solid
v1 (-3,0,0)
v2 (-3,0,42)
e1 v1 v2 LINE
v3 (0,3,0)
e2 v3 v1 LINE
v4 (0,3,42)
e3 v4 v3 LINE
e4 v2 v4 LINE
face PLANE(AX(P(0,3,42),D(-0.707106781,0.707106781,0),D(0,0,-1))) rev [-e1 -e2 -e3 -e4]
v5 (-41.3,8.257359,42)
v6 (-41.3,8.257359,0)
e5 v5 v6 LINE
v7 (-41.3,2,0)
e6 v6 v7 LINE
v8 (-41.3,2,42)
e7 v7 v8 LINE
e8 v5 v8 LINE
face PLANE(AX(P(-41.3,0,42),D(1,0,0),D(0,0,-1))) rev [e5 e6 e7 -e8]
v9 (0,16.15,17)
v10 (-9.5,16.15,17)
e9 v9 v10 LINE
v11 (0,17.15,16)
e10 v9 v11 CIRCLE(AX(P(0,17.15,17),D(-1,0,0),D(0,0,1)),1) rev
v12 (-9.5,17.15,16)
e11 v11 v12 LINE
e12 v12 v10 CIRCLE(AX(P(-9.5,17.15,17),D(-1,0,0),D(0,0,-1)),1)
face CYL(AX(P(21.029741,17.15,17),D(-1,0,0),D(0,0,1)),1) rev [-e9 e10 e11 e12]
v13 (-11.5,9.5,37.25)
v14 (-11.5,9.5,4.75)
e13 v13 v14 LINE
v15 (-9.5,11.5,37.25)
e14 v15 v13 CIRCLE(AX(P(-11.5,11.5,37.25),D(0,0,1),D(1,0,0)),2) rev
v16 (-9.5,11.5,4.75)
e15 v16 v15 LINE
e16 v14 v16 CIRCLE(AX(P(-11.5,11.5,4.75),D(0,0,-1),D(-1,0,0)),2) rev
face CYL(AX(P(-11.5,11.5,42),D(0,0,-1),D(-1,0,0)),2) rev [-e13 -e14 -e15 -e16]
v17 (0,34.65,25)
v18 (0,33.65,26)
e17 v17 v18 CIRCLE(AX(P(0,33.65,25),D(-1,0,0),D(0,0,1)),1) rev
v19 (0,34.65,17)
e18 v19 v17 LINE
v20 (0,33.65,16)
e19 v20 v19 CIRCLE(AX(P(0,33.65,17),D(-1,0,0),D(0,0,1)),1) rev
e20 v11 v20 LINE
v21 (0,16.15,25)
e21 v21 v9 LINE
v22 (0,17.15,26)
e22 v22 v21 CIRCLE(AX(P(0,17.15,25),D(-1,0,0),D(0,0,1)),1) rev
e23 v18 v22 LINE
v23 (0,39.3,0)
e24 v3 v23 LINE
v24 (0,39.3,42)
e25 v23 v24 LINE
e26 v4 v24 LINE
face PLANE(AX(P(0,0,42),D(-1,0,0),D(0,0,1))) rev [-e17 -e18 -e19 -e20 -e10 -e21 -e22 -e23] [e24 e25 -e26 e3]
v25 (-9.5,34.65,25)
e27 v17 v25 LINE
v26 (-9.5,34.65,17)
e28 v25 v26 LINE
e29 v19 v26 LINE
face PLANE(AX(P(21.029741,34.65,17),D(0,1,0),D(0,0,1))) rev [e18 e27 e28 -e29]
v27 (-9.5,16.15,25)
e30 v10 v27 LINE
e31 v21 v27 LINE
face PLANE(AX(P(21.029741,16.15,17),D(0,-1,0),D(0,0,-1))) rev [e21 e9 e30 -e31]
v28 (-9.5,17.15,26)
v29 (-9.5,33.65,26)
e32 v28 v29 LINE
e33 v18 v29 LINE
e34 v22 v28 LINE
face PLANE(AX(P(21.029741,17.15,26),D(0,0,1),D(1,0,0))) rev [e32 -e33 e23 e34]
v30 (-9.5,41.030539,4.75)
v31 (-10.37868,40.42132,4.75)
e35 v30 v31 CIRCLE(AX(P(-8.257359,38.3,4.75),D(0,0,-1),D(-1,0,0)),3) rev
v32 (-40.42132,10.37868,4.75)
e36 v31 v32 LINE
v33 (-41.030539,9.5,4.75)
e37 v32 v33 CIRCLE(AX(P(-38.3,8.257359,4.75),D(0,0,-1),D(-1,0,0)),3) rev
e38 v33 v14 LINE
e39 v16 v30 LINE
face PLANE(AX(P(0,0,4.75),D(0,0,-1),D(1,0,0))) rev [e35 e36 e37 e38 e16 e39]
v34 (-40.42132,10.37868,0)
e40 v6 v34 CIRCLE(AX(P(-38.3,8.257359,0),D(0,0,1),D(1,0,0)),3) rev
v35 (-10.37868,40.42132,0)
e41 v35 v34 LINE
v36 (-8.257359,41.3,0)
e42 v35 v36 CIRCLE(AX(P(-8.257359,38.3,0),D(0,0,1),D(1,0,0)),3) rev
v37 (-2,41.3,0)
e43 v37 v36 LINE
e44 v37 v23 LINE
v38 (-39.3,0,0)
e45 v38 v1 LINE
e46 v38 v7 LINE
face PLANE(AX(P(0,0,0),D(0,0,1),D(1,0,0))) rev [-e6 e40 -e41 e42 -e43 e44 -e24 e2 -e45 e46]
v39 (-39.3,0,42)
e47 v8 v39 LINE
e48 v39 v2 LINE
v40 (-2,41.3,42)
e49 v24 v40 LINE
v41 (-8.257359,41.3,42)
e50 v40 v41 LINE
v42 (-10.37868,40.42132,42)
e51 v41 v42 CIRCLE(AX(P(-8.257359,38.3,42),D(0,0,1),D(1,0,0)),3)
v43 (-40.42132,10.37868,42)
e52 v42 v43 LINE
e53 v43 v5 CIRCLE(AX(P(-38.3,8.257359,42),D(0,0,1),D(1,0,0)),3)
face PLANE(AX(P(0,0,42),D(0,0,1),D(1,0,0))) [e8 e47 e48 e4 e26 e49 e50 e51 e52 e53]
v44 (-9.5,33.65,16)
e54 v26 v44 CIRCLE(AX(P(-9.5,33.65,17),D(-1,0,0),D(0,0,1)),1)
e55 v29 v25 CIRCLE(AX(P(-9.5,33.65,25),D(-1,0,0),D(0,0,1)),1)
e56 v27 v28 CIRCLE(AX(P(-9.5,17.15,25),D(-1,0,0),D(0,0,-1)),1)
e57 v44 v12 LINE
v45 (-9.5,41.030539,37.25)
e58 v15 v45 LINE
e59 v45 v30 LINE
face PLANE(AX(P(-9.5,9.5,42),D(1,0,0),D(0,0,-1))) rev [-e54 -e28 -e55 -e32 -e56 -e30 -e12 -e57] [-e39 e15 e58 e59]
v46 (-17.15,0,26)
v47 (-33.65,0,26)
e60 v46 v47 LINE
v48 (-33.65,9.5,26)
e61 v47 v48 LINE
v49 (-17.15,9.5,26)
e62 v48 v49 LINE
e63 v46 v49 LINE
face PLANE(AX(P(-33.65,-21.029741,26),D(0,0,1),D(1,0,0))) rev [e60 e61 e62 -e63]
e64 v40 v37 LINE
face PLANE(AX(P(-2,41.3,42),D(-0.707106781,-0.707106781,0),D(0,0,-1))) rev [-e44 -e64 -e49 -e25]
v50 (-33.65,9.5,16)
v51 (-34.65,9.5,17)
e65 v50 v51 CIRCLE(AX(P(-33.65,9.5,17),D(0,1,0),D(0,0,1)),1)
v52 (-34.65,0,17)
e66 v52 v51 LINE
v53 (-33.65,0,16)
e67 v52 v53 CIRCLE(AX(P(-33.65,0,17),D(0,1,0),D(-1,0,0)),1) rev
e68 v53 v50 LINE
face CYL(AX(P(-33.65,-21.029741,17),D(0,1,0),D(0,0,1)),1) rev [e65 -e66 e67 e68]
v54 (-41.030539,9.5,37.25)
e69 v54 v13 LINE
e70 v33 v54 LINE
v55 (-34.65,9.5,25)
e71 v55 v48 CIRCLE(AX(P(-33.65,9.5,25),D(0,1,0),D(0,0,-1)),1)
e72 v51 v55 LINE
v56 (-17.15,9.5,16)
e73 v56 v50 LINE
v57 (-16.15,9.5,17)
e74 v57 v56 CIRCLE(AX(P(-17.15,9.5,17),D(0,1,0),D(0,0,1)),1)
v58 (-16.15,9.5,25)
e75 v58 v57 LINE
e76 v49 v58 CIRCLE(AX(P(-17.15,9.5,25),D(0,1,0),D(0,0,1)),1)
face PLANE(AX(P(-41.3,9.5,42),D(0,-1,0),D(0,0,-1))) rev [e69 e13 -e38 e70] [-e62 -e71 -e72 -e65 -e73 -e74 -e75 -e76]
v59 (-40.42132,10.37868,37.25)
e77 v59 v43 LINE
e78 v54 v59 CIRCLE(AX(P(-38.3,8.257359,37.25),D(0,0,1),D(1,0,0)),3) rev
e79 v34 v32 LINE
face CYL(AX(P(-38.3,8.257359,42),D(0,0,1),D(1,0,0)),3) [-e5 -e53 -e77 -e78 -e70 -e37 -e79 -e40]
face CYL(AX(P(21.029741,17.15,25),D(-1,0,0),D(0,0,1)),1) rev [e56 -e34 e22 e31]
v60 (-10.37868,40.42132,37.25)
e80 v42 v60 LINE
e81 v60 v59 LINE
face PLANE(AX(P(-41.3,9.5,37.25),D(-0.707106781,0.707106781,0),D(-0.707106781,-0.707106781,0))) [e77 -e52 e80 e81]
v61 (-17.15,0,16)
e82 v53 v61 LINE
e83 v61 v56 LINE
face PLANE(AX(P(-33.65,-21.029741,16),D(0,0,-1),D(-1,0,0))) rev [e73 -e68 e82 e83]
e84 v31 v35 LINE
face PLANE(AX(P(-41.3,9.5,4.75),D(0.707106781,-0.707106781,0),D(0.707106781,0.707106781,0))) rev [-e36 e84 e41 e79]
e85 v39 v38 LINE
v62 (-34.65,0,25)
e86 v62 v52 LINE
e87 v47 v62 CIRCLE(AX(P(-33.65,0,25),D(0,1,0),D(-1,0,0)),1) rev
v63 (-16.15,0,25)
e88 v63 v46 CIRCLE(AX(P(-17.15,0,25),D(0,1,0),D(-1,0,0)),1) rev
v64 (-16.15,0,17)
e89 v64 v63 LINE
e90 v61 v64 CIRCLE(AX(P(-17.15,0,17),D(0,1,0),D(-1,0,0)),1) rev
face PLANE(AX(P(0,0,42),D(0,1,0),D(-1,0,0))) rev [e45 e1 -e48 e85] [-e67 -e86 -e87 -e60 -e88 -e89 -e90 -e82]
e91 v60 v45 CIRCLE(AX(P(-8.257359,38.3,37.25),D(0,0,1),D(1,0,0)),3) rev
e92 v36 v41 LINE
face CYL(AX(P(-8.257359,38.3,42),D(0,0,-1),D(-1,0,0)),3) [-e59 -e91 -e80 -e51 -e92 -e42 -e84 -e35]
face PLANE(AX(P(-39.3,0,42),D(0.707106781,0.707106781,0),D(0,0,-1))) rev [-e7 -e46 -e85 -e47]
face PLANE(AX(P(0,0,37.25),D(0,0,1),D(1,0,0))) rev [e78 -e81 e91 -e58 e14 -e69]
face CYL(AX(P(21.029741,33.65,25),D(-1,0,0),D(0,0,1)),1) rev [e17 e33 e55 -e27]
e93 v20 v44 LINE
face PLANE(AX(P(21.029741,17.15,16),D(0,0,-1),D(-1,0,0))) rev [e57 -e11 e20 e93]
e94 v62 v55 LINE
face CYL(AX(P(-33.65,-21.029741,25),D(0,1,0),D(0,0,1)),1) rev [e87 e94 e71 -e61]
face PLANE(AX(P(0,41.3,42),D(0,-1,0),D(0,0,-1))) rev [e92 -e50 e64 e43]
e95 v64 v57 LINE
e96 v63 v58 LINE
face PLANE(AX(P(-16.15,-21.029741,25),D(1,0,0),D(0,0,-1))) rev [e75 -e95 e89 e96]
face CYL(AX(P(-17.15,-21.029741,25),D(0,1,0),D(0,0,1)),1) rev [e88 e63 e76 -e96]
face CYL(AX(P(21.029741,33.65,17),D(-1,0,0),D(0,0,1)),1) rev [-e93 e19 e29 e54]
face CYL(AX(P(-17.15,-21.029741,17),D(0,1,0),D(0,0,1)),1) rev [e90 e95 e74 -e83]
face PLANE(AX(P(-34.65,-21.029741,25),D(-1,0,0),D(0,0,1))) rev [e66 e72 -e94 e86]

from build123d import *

# Parameters (mm, degrees)
BOSS_EXTRUDE1_DEPTH = 42
BOSS_EXTRUDE2_DEPTH = 4.75
CUT_EXTRUDE1_DEPTH  = 9.5
CUT_EXTRUDE2_DEPTH  = 9.5
FILLET6_R           = 2
FILLET7_START       = -1
FILLET7_DEPTH       = 44
FILLET8_START       = -1
FILLET8_DEPTH       = 44
CHAMFER1_SIZE       = 2
CHAMFER2_SIZE       = 3
CHAMFER3_SIZE       = 2


with BuildPart() as part:
    # Sketch1 → Boss-Extrude1 (new body)
    with BuildSketch(Plane.XY):
        Polygon((0, 0), (-41.3, 0), (-41.3, 9.5), (-9.5, 9.5), (-9.5, 41.3), (0, 41.3), align=None)
    extrude(amount=BOSS_EXTRUDE1_DEPTH)

    # Sketch2 → Boss-Extrude2 (add)
    with BuildSketch(Plane.XY.offset(42)):
        Polygon((-41.3, 9.5), (-9.5, 41.3), (-9.5, 9.5), align=None)
    boss_extrude2 = extrude(amount=-BOSS_EXTRUDE2_DEPTH)

    # Mirror1: Boss-Extrude2 across plane
    add(boss_extrude2.mirror(Plane.XY.offset(21)))

    # Sketch3 → Cut-Extrude1 (cut)
    with BuildSketch(Plane.ZY.offset(9.5)):
        with BuildLine():
            Line((17, 16.15), (25, 16.15))
            ThreePointArc((25, 16.15), (25.707106781, 16.442893219), (26, 17.15))
            Line((26, 17.15), (26, 33.65))
            ThreePointArc((26, 33.65), (25.707106781, 34.357106781), (25, 34.65))
            Line((25, 34.65), (17, 34.65))
            ThreePointArc((17, 34.65), (16.292893219, 34.357106781), (16, 33.65))
            Line((16, 33.65), (16, 17.15))
            ThreePointArc((16, 17.15), (16.292893219, 16.442893219), (17, 16.15))
        make_face()
    extrude(amount=-CUT_EXTRUDE1_DEPTH, mode=Mode.SUBTRACT)

    # Sketch4 → Cut-Extrude2 (cut)
    with BuildSketch(Plane(origin=(0, 9.5, 0), x_dir=(1, 0, 0), z_dir=(0, 1, 0))):
        with BuildLine():
            Line((-33.65, -26), (-17.15, -26))
            ThreePointArc((-17.15, -26), (-16.442893219, -25.707106781), (-16.15, -25))
            Line((-16.15, -25), (-16.15, -17))
            ThreePointArc((-16.15, -17), (-16.442893219, -16.292893219), (-17.15, -16))
            Line((-17.15, -16), (-33.65, -16))
            ThreePointArc((-33.65, -16), (-34.357106781, -16.292893219), (-34.65, -17))
            Line((-34.65, -17), (-34.65, -25))
            ThreePointArc((-34.65, -25), (-34.357106781, -25.707106781), (-33.65, -26))
        make_face()
    extrude(amount=-CUT_EXTRUDE2_DEPTH, mode=Mode.SUBTRACT)

    # Fillet6
    fillet6_edges = [part.edges().sort_by_distance(p)[0] for p in [
        (-9.5, 9.5, 21),
    ]]
    fillet(fillet6_edges, radius=FILLET6_R)

    # Fillet7: read off the stored shape, not the designer's step
    # Fillet7 outline → Fillet7 (cut)
    with BuildSketch(Plane.XY.offset(FILLET7_START)):
        with BuildLine():
            Line((-9.5, 41.3), (-10.378679656, 40.421320344))
            ThreePointArc((-10.378679656, 40.421320344), (-9.40540961, 41.071638598), (-8.257359313, 41.3))
            Line((-8.257359313, 41.3), (-9.5, 41.3))
        make_face()
    extrude(amount=FILLET7_DEPTH, mode=Mode.SUBTRACT)

    # Fillet8: read off the stored shape, not the designer's step
    # Fillet8 outline → Fillet8 (cut)
    with BuildSketch(Plane.XY.offset(FILLET8_START)):
        with BuildLine():
            Line((-40.421320344, 10.378679656), (-41.3, 9.5))
            Line((-41.3, 9.5), (-41.3, 8.257359313))
            ThreePointArc((-41.3, 8.257359313), (-41.071638598, 9.40540961), (-40.421320344, 10.378679656))
        make_face()
    extrude(amount=FILLET8_DEPTH, mode=Mode.SUBTRACT)

    # Chamfer1
    chamfer1_edges = [part.edges().sort_by_distance(p)[0] for p in [
        (0, 41.3, 21),
    ]]
    chamfer(chamfer1_edges, length=CHAMFER1_SIZE)

    # Chamfer2
    chamfer2_edges = [part.edges().sort_by_distance(p)[0] for p in [
        (0, 0, 21),
    ]]
    chamfer(chamfer2_edges, length=CHAMFER2_SIZE)

    # Chamfer3
    chamfer3_edges = [part.edges().sort_by_distance(p)[0] for p in [
        (-41.3, 0, 21),
    ]]
    chamfer(chamfer3_edges, length=CHAMFER3_SIZE)


solid = part.part
